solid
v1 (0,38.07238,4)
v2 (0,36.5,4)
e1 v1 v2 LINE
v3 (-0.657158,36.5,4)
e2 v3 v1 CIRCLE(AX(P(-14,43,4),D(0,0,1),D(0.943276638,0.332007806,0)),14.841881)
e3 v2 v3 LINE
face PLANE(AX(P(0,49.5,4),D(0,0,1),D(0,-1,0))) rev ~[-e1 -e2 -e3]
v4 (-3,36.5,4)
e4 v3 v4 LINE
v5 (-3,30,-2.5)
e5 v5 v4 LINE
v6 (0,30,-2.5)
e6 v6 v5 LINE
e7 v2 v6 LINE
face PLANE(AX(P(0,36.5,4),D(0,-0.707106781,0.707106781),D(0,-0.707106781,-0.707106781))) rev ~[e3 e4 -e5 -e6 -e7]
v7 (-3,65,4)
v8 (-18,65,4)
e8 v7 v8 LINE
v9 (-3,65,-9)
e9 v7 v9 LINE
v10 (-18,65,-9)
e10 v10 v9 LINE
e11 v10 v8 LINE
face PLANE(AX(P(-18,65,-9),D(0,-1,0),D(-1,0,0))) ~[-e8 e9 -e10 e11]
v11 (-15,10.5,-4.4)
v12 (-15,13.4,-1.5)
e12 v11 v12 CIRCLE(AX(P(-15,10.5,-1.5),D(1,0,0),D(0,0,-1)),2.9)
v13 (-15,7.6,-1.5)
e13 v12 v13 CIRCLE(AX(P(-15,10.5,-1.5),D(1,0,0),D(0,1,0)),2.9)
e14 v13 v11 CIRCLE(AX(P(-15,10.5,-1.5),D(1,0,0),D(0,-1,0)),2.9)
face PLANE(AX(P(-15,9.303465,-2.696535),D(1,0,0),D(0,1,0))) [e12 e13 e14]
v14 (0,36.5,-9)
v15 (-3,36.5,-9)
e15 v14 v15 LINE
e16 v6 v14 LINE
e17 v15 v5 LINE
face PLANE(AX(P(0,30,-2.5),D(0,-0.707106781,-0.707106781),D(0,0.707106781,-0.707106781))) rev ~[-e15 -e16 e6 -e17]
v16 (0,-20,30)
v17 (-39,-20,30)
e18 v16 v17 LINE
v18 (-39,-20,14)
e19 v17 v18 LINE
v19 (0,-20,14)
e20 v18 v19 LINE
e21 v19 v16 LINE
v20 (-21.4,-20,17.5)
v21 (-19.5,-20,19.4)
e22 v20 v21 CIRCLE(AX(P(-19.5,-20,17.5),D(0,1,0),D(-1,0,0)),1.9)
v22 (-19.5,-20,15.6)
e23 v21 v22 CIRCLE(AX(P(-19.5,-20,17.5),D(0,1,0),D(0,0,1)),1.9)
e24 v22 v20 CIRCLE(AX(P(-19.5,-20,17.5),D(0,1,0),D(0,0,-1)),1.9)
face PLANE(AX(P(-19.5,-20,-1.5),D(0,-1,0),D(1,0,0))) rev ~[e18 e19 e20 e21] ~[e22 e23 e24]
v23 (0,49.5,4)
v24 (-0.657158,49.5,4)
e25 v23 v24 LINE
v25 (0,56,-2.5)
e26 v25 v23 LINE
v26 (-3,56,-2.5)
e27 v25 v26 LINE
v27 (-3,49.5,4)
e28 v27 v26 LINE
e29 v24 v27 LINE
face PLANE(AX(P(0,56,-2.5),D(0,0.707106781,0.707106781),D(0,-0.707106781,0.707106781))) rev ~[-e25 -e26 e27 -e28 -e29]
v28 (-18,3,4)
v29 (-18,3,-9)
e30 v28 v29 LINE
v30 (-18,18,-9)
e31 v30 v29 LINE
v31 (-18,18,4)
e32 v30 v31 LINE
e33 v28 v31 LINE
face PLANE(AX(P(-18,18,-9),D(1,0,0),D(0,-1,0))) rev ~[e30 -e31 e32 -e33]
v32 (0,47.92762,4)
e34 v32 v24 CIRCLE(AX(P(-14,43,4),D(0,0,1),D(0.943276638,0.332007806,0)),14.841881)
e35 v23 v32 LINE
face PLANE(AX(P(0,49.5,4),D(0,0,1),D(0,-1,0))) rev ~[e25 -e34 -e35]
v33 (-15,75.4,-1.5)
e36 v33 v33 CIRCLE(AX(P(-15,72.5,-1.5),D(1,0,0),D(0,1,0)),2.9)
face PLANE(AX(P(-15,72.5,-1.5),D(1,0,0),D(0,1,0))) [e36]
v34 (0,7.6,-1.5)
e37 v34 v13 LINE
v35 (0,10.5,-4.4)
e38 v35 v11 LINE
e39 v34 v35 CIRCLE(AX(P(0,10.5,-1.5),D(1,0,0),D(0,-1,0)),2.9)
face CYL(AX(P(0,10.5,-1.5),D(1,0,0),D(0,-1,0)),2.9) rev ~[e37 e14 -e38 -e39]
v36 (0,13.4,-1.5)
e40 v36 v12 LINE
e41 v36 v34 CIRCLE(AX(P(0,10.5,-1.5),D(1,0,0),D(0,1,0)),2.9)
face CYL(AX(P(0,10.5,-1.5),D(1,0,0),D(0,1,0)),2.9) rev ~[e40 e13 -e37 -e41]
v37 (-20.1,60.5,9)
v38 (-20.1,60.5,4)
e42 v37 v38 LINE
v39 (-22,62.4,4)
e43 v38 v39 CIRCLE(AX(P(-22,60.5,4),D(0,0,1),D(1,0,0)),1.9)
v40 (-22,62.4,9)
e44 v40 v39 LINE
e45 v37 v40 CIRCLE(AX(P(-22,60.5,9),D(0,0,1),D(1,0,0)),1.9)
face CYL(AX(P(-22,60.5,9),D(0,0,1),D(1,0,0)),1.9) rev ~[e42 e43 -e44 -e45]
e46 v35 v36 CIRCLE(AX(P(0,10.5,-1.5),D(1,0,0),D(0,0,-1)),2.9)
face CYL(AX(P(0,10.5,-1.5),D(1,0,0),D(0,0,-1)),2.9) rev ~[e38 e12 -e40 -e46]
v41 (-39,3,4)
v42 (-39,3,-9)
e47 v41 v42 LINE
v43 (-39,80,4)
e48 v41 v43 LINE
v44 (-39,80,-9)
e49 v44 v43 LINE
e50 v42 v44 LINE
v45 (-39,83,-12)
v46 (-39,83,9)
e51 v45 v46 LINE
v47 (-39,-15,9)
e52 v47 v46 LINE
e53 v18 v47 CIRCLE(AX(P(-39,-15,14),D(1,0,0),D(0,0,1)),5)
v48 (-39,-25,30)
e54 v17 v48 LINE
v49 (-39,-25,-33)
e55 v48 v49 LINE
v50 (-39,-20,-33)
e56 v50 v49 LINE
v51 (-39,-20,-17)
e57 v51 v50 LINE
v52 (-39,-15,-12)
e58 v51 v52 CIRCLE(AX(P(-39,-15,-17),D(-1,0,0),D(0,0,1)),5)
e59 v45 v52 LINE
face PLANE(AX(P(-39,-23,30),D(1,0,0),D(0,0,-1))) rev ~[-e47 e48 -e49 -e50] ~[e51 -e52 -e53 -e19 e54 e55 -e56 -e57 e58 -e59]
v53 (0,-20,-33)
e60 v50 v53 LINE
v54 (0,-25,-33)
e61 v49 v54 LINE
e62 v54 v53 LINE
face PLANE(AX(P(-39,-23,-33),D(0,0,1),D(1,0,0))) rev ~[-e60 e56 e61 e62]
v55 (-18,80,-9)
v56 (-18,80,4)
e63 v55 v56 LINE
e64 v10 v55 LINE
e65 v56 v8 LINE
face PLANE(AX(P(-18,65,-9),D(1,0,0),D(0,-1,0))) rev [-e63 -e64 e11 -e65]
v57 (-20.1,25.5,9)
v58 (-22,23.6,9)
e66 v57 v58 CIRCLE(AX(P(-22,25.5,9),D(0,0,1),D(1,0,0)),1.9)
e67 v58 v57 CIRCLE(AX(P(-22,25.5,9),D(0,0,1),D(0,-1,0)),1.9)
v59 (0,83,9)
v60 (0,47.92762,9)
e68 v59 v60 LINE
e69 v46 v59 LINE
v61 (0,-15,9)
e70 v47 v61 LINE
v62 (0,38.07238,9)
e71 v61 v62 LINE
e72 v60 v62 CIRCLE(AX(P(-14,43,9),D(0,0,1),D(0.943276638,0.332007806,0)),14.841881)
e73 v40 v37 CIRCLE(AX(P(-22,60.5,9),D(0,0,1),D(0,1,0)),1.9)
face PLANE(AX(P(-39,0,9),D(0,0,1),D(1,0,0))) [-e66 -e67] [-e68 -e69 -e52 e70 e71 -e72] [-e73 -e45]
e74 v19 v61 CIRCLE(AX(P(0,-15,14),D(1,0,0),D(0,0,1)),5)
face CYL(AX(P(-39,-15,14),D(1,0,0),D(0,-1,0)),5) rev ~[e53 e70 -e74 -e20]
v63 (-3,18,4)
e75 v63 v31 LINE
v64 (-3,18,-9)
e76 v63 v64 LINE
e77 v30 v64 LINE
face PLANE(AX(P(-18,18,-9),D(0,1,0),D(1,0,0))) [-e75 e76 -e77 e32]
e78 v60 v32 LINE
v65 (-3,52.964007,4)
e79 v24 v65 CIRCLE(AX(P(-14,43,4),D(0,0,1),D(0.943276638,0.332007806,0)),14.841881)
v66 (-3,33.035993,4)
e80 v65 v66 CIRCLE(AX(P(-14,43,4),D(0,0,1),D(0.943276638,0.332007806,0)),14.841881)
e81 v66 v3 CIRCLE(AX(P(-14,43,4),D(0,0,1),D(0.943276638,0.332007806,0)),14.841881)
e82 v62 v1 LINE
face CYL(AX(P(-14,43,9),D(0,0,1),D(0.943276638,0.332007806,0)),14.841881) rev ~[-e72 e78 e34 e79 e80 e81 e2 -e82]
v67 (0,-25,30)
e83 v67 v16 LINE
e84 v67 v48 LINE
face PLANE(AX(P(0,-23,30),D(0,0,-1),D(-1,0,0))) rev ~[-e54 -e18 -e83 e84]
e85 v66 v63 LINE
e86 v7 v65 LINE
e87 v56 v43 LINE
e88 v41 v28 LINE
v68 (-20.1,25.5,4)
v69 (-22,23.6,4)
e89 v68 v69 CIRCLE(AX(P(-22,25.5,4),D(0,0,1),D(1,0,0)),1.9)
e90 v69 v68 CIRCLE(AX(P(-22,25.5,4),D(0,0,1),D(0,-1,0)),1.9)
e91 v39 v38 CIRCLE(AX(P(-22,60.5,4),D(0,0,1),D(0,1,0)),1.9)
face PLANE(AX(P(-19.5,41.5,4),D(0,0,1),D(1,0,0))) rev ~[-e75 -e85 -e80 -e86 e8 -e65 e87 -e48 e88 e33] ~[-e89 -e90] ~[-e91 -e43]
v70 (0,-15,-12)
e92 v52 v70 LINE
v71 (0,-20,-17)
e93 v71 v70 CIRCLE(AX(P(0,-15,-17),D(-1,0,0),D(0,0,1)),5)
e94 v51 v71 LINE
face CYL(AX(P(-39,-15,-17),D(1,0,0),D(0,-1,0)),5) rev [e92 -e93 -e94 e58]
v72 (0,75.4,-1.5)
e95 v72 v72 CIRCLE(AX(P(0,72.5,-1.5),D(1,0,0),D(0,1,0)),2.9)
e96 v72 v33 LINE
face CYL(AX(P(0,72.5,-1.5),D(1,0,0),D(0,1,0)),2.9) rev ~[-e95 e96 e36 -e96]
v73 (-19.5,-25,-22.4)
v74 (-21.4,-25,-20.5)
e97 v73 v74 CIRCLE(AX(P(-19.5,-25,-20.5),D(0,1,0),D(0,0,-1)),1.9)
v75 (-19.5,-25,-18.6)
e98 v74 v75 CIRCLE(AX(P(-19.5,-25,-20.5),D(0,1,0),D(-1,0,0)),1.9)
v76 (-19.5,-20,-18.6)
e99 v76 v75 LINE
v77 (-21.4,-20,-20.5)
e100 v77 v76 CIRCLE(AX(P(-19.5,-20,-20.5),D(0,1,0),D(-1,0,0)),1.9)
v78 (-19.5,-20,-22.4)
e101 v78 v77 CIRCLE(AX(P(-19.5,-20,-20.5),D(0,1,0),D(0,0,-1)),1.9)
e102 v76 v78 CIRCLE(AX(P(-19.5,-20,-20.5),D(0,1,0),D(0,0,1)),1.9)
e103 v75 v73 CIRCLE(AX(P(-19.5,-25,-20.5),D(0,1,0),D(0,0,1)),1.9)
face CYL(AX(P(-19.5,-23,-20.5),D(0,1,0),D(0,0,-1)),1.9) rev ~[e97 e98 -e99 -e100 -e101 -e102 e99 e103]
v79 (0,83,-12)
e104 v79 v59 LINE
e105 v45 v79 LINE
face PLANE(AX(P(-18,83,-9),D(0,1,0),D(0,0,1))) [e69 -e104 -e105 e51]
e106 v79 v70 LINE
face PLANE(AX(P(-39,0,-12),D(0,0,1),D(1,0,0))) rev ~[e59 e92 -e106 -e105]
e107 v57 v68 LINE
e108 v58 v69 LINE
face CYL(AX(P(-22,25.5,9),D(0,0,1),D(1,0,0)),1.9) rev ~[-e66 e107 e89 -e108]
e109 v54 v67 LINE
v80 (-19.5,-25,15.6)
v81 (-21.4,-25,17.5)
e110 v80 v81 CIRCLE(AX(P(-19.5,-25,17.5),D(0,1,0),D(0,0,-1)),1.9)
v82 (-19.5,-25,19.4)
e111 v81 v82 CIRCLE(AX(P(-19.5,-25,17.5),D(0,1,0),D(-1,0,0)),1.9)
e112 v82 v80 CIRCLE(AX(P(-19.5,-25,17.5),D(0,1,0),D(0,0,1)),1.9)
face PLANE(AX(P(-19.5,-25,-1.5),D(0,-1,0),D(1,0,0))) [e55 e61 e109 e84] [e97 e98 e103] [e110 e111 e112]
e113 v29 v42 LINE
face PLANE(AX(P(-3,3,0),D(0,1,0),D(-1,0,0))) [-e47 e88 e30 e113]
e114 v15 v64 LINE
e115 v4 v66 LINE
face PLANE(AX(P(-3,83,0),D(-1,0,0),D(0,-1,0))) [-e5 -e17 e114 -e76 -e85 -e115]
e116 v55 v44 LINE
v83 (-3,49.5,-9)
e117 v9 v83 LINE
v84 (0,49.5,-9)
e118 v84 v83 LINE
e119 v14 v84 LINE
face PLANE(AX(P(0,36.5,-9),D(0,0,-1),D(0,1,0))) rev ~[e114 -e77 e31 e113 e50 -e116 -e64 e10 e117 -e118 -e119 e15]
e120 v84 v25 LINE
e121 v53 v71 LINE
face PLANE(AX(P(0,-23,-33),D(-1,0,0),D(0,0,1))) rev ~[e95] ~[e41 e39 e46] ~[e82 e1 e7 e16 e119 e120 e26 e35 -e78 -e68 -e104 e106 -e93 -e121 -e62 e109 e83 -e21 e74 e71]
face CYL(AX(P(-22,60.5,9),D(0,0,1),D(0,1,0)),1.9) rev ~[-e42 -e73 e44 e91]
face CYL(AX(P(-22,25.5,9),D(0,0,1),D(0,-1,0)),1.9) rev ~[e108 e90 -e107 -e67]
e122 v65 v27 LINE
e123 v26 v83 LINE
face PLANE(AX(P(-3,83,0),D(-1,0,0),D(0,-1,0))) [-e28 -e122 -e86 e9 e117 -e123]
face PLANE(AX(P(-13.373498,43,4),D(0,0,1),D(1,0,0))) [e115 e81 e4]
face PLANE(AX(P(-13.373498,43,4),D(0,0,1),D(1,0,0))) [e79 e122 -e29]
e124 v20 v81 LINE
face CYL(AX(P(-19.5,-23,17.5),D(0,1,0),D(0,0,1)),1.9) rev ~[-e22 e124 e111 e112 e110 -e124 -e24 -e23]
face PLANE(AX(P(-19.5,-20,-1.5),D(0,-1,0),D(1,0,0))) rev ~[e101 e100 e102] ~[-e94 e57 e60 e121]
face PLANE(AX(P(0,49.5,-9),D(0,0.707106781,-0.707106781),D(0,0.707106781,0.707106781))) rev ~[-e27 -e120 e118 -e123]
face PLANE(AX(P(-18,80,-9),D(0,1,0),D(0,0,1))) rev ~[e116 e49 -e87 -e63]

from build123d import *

# Parameters (mm, degrees)
F1_DEPTH  = 9
F2_W      = 39
F2_H      = 83
F3_DEPTH  = 5
F6_DEPTH  = 18
F7_W      = 18
F7_H      = 18
F8_DEPTH  = 18
F10_DEPTH = 3
F12_DEPTH = 5
F13_R     = 2.9
F14_DEPTH = 15
F15_W     = 3
F15_H     = 13
F16_DEPTH = 21
F17_DEPTH = 5
F18_W     = 39
F18_H     = 21
F19_DEPTH = 20
F21_DEPTH = 3
F22_R     = 5
F24_DEPTH = 25
F26_R     = 3.6982006044
F26_R_2   = 2.7022216625
F26_R_3   = 3.2521132856
F26_R_4   = 2.4365005618
F27_DEPTH = 3
F29_DEPTH = 25
F30_DEPTH = 2


# Not quite as in the source:
# - a pattern or mirror of a feature is missing from the dataset's text; its kind, count and spacing are read off the source's solid


with BuildPart() as f1:
    # F0 (on Top) → F1 (new body, symmetric)
    with BuildSketch(Plane.XY):
        Polygon((0, 0), (0, 83), (-3, 83), (-3, 3), (-39, 3), (-39, 0), align=None)
    extrude(amount=F1_DEPTH, both=True)

    # F2 (on face) → F3 (join)
    with BuildSketch(Plane.XY.offset(9)):
        with Locations((-19.5, 41.5)):
            Rectangle(F2_W, F2_H)
    extrude(amount=-F3_DEPTH)

    # F5 (on face) → F6 (join)
    with BuildSketch(Plane(origin=(0, 83, 0), x_dir=(-1, 0, 0), z_dir=(0, 1, 0))):
        Polygon((18, 9), (0, 9), (0, -9), (3, -9), (3, 4), (18, 4), align=None)
    extrude(amount=-F6_DEPTH)

    # F7 (on face) → F8 (join)
    with BuildSketch(Plane(origin=(0, 0, -9), x_dir=(1, 0, 0), z_dir=(0, 0, -1))):
        with Locations((-9, -9)):
            Rectangle(F7_W, F7_H)
    f8 = extrude(amount=-F8_DEPTH)

    # F8_copies: F8 across plane
    add(f8.mirror(Plane.ZX.offset(41.5)))

    # F9 (on face) → F10 (join)
    with BuildSketch(Plane(origin=(0, 0, -9), x_dir=(1, 0, 0), z_dir=(0, 0, -1))):
        Polygon((-22, -83), (0, -83), (0, 0), (-39, 0), (-39, -83), align=None)
    extrude(amount=F10_DEPTH)

    # F11 (on face) → F12 (cut, through all)
    with BuildSketch(Plane.XY.offset(9)):
        with BuildLine():
            Line((0, 38.0723795157), (0, 47.9276204843))
            ThreePointArc((0, 47.9276204843), (-28.8418814049, 43), (0, 38.0723795157))
        make_face()
    extrude(amount=-F12_DEPTH, mode=Mode.SUBTRACT)

    # F13 (on face) → F14 (cut)
    with BuildSketch(Plane.YZ):
        with BuildLine():
            Line((10.5, -1.5), (7.6, -1.5))
            ThreePointArc((7.6, -1.5), (8.4493903346, -3.5506096654), (10.5, -4.4))
            Line((10.5, -4.4), (10.5, -1.5))
        make_face()
        with BuildLine():
            ThreePointArc((13.4, -1.5), (10.5, 1.4), (7.6, -1.5))
            Line((7.6, -1.5), (10.5, -1.5))
            Line((10.5, -1.5), (10.5, -4.4))
            ThreePointArc((10.5, -4.4), (12.5506096654, -3.5506096654), (13.4, -1.5))
        make_face()
        Polygon((30, -2.5), (36.5, -9), (36.5, 4), align=None)
        Polygon((36.5, 4), (36.5, -9), (49.5, -9), (49.5, 4), (47.9276204843, 4), (38.0723795157, 4), align=None)
        Polygon((49.5, 4), (49.5, -9), (56, -2.5), align=None)
        with Locations((72.5, -1.5)):
            Circle(F13_R)
    extrude(amount=-F14_DEPTH, mode=Mode.SUBTRACT)

    # F15 (on face) → F16 (join, through all)
    with BuildSketch(Plane(origin=(-18, 0, 0), x_dir=(0, -1, 0), z_dir=(-1, 0, 0))):
        with Locations((-81.5, -2.5)):
            Rectangle(F15_W, F15_H)
    extrude(amount=F16_DEPTH)

    # F4 (on face) → F17 (cut, through all)
    with BuildSketch(Plane.XY.offset(9)):
        with BuildLine():
            ThreePointArc((-22, 62.4), (-23.3435028843, 59.1564971157), (-20.1, 60.5))
            ThreePointArc((-20.1, 60.5), (-20.6564971157, 61.8435028843), (-22, 62.4))
        make_face()
        with BuildLine():
            ThreePointArc((-22, 23.6), (-20.6564971157, 24.1564971157), (-20.1, 25.5))
            ThreePointArc((-20.1, 25.5), (-23.3435028843, 26.8435028843), (-22, 23.6))
        make_face()
    extrude(amount=-F17_DEPTH, mode=Mode.SUBTRACT)

    # F18 (on face) → F19 (join)
    with BuildSketch(Plane.XZ):
        with Locations((-19.5, -1.5)):
            Rectangle(F18_W, F18_H)
    extrude(amount=F19_DEPTH)

    # F20 (on face) → F21 (join)
    with BuildSketch(Plane.XZ.offset(20)):
        Polygon((0, 30), (-39, 30), (-39, 9), (-39, -12), (-39, -33), (0, -33), (0, -12), (0, 9), align=None)
    extrude(amount=F21_DEPTH)

    # F22
    f22_edges = [f1.edges().sort_by_distance(p)[0] for p in [
        (-19.5, -20, -12),
        (-19.5, -20, 9),
    ]]
    fillet(f22_edges, radius=F22_R)

    # F23 (on face) → F24 (cut)
    with BuildSketch(Plane.XZ.offset(23)):
        with BuildLine():
            Line((-32, 21.1), (-32, 23))
            Line((-32, 23), (-30.1, 23))
            ThreePointArc((-30.1, 23), (-33.3435028843, 24.3435028843), (-32, 21.1))
        make_face()
        with BuildLine():
            Line((-30.1, 23), (-32, 23))
            Line((-32, 23), (-32, 21.1))
            ThreePointArc((-32, 21.1), (-30.6564971157, 21.6564971157), (-30.1, 23))
        make_face()
        with BuildLine():
            ThreePointArc((-5.1, 23), (-7, 24.9), (-8.9, 23))
            Line((-8.9, 23), (-7, 23))
            Line((-7, 23), (-7, 21.1))
            ThreePointArc((-7, 21.1), (-5.6564971157, 21.6564971157), (-5.1, 23))
        make_face()
        with BuildLine():
            Line((-7, 23), (-8.9, 23))
            ThreePointArc((-8.9, 23), (-8.3435028843, 21.6564971157), (-7, 21.1))
            Line((-7, 21.1), (-7, 23))
        make_face()
        with BuildLine():
            Line((-32, -26), (-32, -24.1))
            ThreePointArc((-32, -24.1), (-33.3435028843, -27.3435028843), (-30.1, -26))
            Line((-30.1, -26), (-32, -26))
        make_face()
        with BuildLine():
            ThreePointArc((-30.1, -26), (-30.6564971157, -24.6564971157), (-32, -24.1))
            Line((-32, -24.1), (-32, -26))
            Line((-32, -26), (-30.1, -26))
        make_face()
        with BuildLine():
            ThreePointArc((-5.1, -26), (-5.6564971157, -24.6564971157), (-7, -24.1))
            Line((-7, -24.1), (-7, -26))
            Line((-7, -26), (-8.9, -26))
            ThreePointArc((-8.9, -26), (-7, -27.9), (-5.1, -26))
        make_face()
        with BuildLine():
            Line((-7, -26), (-7, -24.1))
            ThreePointArc((-7, -24.1), (-8.3435028843, -24.6564971157), (-8.9, -26))
            Line((-8.9, -26), (-7, -26))
        make_face()
    extrude(amount=-F24_DEPTH, mode=Mode.SUBTRACT)

    # F26 (on face) → F27 (join, through all)
    with BuildSketch(Plane(origin=(0, -20, 0), x_dir=(-1, 0, 0), z_dir=(0, 1, 0))):
        with Locations((32, 23)):
            Circle(F26_R)
        with Locations((7, 23)):
            Circle(F26_R_2)
        with Locations((31.5193422139, -25.7969032973)):
            Circle(F26_R_3)
        with Locations((7.0765195414, -26.2656044215)):
            Circle(F26_R_4)
    extrude(amount=-F27_DEPTH)

    # F28 (on face) → F29 (cut)
    with BuildSketch(Plane(origin=(0, -20, 0), x_dir=(-1, 0, 0), z_dir=(0, 1, 0))):
        with BuildLine():
            ThreePointArc((19.5, 15.6), (20.8435028843, 16.1564971157), (21.4, 17.5))
            ThreePointArc((21.4, 17.5), (20.8435028843, 18.8435028843), (19.5, 19.4))
            Line((19.5, 19.4), (19.5, 17.5))
            Line((19.5, 17.5), (19.5, 15.6))
        make_face()
        with BuildLine():
            ThreePointArc((21.4, -20.5), (20.8435028843, -19.1564971157), (19.5, -18.6))
            Line((19.5, -18.6), (19.5, -20.5))
            Line((19.5, -20.5), (19.5, -22.4))
            ThreePointArc((19.5, -22.4), (20.8435028843, -21.8435028843), (21.4, -20.5))
        make_face()
        with BuildLine():
            Line((19.5, -20.5), (19.5, -18.6))
            ThreePointArc((19.5, -18.6), (17.6, -20.5), (19.5, -22.4))
            Line((19.5, -22.4), (19.5, -20.5))
        make_face()
        with BuildLine():
            Line((19.5, 17.5), (19.5, 19.4))
            ThreePointArc((19.5, 19.4), (17.6, 17.5), (19.5, 15.6))
            Line((19.5, 15.6), (19.5, 17.5))
        make_face()
    extrude(amount=-F29_DEPTH, mode=Mode.SUBTRACT)

    # F30 (add): a face of the model
    f30_faces = [f1.faces().sort_by_distance(p)[0] for p in [
        (-19.5, -23, -1.5),
    ]]
    extrude(f30_faces, amount=F30_DEPTH)


solid = f1.part
